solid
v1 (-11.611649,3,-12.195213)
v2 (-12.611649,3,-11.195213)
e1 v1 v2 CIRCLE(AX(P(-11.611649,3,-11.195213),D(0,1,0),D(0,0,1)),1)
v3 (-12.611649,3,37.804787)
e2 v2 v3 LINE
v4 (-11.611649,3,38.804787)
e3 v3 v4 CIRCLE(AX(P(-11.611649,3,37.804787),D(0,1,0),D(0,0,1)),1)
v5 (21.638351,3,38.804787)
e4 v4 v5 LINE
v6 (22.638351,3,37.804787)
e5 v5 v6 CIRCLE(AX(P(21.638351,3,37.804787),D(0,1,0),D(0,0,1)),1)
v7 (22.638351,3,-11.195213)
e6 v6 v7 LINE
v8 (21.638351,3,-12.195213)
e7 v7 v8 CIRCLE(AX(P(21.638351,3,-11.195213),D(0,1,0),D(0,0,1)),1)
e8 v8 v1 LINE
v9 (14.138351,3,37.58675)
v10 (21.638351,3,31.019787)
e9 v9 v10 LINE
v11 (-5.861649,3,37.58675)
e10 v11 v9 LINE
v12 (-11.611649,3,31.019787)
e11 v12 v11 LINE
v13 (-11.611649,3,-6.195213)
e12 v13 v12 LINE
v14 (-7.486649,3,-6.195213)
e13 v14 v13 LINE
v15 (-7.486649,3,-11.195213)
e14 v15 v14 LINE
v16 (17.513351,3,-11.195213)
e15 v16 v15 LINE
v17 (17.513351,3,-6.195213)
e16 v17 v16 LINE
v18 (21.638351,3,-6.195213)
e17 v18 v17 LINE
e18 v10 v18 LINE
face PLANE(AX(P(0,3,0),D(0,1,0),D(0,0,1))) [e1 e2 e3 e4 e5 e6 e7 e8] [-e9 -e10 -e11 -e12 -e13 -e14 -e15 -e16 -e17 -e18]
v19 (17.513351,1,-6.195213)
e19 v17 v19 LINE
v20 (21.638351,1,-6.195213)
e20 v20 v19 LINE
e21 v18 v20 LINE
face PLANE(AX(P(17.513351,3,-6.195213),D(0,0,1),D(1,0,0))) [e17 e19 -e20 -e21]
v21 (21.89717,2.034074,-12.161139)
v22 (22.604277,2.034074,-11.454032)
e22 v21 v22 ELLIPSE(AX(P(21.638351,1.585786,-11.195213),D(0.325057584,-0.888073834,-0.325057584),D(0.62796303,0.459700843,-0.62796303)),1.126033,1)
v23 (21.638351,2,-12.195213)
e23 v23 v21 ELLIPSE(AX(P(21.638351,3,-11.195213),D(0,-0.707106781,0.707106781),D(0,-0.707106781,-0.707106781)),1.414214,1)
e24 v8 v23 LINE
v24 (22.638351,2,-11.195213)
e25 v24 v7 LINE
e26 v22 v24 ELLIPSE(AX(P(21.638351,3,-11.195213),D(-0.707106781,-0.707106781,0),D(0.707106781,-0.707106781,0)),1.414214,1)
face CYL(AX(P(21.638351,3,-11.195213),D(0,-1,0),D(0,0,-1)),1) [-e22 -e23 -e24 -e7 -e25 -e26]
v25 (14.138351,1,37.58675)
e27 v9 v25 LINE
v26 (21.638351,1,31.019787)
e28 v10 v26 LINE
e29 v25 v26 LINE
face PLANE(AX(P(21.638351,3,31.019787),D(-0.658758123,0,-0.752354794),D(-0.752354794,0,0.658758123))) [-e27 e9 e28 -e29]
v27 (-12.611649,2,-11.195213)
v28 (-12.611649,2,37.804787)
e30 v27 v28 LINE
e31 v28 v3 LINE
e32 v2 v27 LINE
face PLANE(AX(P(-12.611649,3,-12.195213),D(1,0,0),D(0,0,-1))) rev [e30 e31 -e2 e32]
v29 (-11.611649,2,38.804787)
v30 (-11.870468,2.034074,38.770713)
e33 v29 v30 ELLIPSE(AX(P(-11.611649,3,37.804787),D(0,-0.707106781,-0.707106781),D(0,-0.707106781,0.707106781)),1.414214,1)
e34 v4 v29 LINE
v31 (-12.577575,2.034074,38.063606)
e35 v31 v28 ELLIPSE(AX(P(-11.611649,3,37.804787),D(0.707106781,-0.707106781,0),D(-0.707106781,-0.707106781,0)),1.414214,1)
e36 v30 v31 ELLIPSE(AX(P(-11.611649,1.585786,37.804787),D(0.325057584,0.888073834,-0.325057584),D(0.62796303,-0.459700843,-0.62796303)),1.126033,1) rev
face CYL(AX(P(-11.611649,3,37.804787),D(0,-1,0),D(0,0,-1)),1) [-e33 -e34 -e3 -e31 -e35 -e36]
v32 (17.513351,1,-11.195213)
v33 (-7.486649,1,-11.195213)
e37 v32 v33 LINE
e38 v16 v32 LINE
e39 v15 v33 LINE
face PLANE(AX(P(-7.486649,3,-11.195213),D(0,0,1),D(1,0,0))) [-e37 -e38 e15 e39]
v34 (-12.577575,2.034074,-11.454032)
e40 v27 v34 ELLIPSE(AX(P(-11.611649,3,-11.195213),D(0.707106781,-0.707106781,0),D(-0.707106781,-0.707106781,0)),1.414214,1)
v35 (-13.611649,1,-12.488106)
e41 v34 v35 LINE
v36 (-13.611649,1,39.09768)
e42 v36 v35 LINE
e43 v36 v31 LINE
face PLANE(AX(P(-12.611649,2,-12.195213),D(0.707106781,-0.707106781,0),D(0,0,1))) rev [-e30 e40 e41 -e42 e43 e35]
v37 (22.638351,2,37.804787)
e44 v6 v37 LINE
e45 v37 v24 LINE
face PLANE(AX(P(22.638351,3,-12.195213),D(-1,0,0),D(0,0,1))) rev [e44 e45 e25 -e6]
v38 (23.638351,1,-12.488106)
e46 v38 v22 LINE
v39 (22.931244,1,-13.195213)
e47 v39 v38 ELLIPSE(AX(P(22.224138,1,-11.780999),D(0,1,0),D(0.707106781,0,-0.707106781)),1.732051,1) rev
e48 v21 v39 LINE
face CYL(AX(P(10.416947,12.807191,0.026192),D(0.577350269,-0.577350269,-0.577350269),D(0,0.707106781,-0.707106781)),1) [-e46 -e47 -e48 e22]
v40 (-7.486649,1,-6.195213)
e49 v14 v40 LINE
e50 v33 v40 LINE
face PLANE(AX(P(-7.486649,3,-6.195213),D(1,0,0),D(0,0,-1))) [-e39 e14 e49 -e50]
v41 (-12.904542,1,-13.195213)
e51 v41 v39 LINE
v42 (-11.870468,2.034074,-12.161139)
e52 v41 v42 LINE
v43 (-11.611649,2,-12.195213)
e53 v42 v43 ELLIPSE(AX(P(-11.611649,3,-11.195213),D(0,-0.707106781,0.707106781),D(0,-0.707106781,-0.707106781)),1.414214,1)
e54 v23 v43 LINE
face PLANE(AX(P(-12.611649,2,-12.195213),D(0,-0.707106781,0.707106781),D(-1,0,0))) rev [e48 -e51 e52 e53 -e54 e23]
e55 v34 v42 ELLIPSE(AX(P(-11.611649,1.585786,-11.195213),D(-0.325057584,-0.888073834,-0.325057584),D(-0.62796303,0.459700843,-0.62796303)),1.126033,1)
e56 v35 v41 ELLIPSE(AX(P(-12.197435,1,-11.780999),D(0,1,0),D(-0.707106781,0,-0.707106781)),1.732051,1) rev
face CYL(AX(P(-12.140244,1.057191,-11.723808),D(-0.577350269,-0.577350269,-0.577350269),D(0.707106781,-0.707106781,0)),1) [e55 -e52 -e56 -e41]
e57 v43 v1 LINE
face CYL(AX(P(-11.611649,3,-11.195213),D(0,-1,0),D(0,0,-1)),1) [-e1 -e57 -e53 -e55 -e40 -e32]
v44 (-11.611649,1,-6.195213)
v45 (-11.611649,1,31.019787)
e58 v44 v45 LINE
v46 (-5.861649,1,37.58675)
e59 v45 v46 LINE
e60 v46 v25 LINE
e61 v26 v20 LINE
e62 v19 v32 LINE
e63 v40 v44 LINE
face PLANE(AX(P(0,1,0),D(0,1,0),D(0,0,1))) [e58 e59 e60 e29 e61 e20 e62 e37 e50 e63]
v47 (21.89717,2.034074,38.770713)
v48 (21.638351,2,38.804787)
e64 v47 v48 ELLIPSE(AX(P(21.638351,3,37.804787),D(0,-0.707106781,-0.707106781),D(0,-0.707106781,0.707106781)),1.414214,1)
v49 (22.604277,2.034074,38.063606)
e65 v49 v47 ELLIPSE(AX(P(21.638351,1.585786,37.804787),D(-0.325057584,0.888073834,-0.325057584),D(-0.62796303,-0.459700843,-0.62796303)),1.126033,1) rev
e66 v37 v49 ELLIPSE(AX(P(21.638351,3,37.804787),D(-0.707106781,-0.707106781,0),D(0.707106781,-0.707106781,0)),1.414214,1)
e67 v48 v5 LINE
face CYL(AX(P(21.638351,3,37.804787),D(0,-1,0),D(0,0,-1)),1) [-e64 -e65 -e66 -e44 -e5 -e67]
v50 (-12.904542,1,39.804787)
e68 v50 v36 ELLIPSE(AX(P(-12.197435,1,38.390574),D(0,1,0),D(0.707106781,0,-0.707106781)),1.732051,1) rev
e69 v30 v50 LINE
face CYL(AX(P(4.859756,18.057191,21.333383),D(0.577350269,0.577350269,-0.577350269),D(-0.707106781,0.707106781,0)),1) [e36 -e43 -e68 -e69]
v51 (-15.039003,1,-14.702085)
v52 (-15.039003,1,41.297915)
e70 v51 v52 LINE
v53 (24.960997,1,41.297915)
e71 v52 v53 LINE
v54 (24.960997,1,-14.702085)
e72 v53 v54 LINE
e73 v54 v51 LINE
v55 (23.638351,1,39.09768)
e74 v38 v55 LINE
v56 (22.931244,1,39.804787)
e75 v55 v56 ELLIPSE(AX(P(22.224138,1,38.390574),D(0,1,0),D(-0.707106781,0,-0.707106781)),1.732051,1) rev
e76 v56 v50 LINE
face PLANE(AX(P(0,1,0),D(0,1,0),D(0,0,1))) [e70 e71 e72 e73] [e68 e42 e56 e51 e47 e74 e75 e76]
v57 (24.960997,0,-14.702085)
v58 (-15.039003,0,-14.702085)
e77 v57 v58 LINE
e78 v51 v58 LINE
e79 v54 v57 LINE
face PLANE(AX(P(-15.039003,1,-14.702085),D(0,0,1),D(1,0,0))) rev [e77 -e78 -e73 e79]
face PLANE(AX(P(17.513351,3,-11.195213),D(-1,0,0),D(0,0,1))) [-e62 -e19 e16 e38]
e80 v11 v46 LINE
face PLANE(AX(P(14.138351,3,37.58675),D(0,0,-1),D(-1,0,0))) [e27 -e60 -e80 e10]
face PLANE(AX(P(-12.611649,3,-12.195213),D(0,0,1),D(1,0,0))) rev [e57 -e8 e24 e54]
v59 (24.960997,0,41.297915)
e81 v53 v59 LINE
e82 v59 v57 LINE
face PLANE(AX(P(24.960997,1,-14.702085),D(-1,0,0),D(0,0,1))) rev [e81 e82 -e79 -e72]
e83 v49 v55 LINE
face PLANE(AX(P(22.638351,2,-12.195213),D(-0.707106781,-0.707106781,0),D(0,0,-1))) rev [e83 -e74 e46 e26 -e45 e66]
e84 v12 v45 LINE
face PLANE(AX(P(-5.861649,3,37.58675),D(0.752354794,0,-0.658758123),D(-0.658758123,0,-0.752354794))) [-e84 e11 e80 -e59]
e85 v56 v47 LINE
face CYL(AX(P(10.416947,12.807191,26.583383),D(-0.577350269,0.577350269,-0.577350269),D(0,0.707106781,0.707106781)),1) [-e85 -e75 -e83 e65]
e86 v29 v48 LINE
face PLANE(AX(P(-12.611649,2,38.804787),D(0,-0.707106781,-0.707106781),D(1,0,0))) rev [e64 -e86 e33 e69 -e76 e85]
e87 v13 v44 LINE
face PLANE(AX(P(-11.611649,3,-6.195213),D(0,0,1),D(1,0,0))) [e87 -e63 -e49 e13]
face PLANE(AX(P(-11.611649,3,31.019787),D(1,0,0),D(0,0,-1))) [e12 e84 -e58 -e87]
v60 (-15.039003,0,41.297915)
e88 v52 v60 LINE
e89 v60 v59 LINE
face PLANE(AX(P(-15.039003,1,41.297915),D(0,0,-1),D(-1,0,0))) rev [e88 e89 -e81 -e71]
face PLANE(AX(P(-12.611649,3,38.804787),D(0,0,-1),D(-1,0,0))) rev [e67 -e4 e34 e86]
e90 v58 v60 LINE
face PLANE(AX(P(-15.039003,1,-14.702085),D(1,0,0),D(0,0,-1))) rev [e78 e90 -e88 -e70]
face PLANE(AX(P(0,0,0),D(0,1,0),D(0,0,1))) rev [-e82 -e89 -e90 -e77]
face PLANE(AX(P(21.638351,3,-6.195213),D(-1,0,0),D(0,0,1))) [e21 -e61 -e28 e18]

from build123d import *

# Parameters (mm, degrees)
SKETCH_1_W      = 40
SKETCH_1_H      = 56
EXTRUDE_1_DEPTH = 1
SKETCH_2_W      = 35.25
SKETCH_2_H      = 51
EXTRUDE_2_DEPTH = 2
CHAMFER_1_SIZE  = 1
FILLET_1_R      = 1


with BuildPart() as part:
    # Эскиз1 → Бобышка-Вытянуть1 (new body)
    with BuildSketch(Plane(origin=(0, 0, 0), x_dir=(1, 0, 0), z_dir=(0, 1, 0))):
        with Locations((4.960996663, -13.297915159)):
            Rectangle(SKETCH_1_W, SKETCH_1_H)
    extrude(amount=EXTRUDE_1_DEPTH)

    # Эскиз2 → Бобышка-Вытянуть2 (add)
    with BuildSketch(Plane(origin=(0, 1, 0), x_dir=(1, 0, 0), z_dir=(0, 1, 0))):
        with Locations((5.013351172, -13.304787139)):
            Rectangle(SKETCH_2_W, SKETCH_2_H)
        Polygon((-7.486648828, 11.195212861), (17.513351172, 11.195212861), (17.513351172, 6.195212861), (21.638351172, 6.195212861), (21.638351172, -31.019787139), (14.138351172, -37.586749907), (-5.861648828, -37.586749907), (-11.611648828, -31.019787139), (-11.611648828, 6.195212861), (-7.486648828, 6.195212861), align=None, mode=Mode.SUBTRACT)
    extrude(amount=EXTRUDE_2_DEPTH)

    # Фаска1
    chamfer_1_edges = [part.edges().sort_by_distance(p)[0] for p in [
        (-12.611648828, 1, 13.304787139),
        (5.013351172, 1, 38.804787139),
        (22.638351172, 1, 13.304787139),
        (5.013351172, 1, -12.195212861),
    ]]
    chamfer(chamfer_1_edges, length=CHAMFER_1_SIZE)

    # Скругление1
    # the kernel refuses this fillet: 1 mm, written as the material it takes off along each edge
    with BuildSketch(Plane(origin=(-12.611648828, -0.5, -12.195212861), x_dir=(0, 0, 1), z_dir=(0, 1, 0))) as fillet_1_piece_1_section:
        with BuildLine():
            CenterArc((FILLET_1_R, FILLET_1_R), FILLET_1_R, 180, 90)
            Line((0, FILLET_1_R), (0, 0))
            Line((0, 0), (FILLET_1_R, 0))
        make_face()
    fillet_1_piece_1 = extrude(amount=6, mode=Mode.PRIVATE)
    fillet_1_piece_1 = split(fillet_1_piece_1, bisect_by=Plane(origin=(-12.204207693, 2.407441135, -12.152230903), z_dir=(0.7071067811865476, -0.7071067811865476, 0)), keep=Keep.TOP, mode=Mode.PRIVATE)
    fillet_1_piece_1 = split(fillet_1_piece_1, bisect_by=Plane(origin=(-12.0827213, 2.16446835, -12.030744511), z_dir=(0, 0.7071067811865476, -0.7071067811865476)), keep=Keep.TOP, mode=Mode.PRIVATE)
    add(fillet_1_piece_1, mode=Mode.SUBTRACT)
    with BuildSketch(Plane(origin=(-12.611648828, -0.5, -12.195212861), x_dir=(0, 0, 1), z_dir=(0, 1, 0))) as fillet_1_piece_2_section:
        with BuildLine():
            CenterArc((FILLET_1_R, FILLET_1_R), FILLET_1_R, 180, 90)
            Line((0, FILLET_1_R), (0, 0))
            Line((0, 0), (FILLET_1_R, 0))
        make_face()
    fillet_1_piece_2 = extrude(amount=6, mode=Mode.PRIVATE)
    fillet_1_piece_2 = split(fillet_1_piece_2, bisect_by=Plane(origin=(-12.447180477, 2.16446835, -11.666285334), z_dir=(-0.7071067811865476, 0.7071067811865476, 0)), keep=Keep.TOP, mode=Mode.PRIVATE)
    fillet_1_piece_2 = split(fillet_1_piece_2, bisect_by=Plane(origin=(-12.56866687, 2.407441135, -11.787771726), z_dir=(0, -0.7071067811865476, 0.7071067811865476)), keep=Keep.TOP, mode=Mode.PRIVATE)
    add(fillet_1_piece_2, mode=Mode.SUBTRACT)
    with BuildSketch(Plane(origin=(-12.611648828, -0.5, -12.195212861), x_dir=(0, 0, 1), z_dir=(0, 1, 0))) as fillet_1_piece_3_section:
        with BuildLine():
            CenterArc((FILLET_1_R, FILLET_1_R), FILLET_1_R, 180, 90)
            Line((0, FILLET_1_R), (0, 0))
            Line((0, 0), (FILLET_1_R, 0))
        make_face()
    fillet_1_piece_3 = extrude(amount=6, mode=Mode.PRIVATE)
    fillet_1_piece_3 = split(fillet_1_piece_3, bisect_by=Plane(origin=(-11.535111432, 3.076537395, -11.974767382), z_dir=(-0.7071067811865476, 0.7071067811865476, 0)), keep=Keep.TOP, mode=Mode.PRIVATE)
    fillet_1_piece_3 = split(fillet_1_piece_3, bisect_by=Plane(origin=(-12.391203349, 3.076537395, -11.118675466), z_dir=(0, 0.7071067811865476, -0.7071067811865476)), keep=Keep.TOP, mode=Mode.PRIVATE)
    add(fillet_1_piece_3, mode=Mode.SUBTRACT)
    with BuildSketch(Plane(origin=(-12.611648828, -0.5, 38.804787139), x_dir=(0, 0, -1), z_dir=(0, 1, 0))) as fillet_1_piece_4_section:
        with BuildLine():
            CenterArc((FILLET_1_R, -FILLET_1_R), FILLET_1_R, 90, 90)
            Line((0, -FILLET_1_R), (0, 0))
            Line((0, 0), (FILLET_1_R, 0))
        make_face()
    fillet_1_piece_4 = extrude(amount=6, mode=Mode.PRIVATE)
    fillet_1_piece_4 = split(fillet_1_piece_4, bisect_by=Plane(origin=(-12.204207693, 2.407441135, 38.761805181), z_dir=(0.7071067811865476, -0.7071067811865476, 0)), keep=Keep.TOP, mode=Mode.PRIVATE)
    fillet_1_piece_4 = split(fillet_1_piece_4, bisect_by=Plane(origin=(-12.0827213, 2.16446835, 38.640318789), z_dir=(0, 0.7071067811865476, 0.7071067811865476)), keep=Keep.TOP, mode=Mode.PRIVATE)
    add(fillet_1_piece_4, mode=Mode.SUBTRACT)
    with BuildSketch(Plane(origin=(-12.611648828, -0.5, 38.804787139), x_dir=(0, 0, -1), z_dir=(0, 1, 0))) as fillet_1_piece_5_section:
        with BuildLine():
            CenterArc((FILLET_1_R, -FILLET_1_R), FILLET_1_R, 90, 90)
            Line((0, -FILLET_1_R), (0, 0))
            Line((0, 0), (FILLET_1_R, 0))
        make_face()
    fillet_1_piece_5 = extrude(amount=6, mode=Mode.PRIVATE)
    fillet_1_piece_5 = split(fillet_1_piece_5, bisect_by=Plane(origin=(-12.447180477, 2.16446835, 38.275859612), z_dir=(-0.7071067811865476, 0.7071067811865476, 0)), keep=Keep.TOP, mode=Mode.PRIVATE)
    fillet_1_piece_5 = split(fillet_1_piece_5, bisect_by=Plane(origin=(-12.56866687, 2.407441135, 38.397346004), z_dir=(0, -0.7071067811865476, -0.7071067811865476)), keep=Keep.TOP, mode=Mode.PRIVATE)
    add(fillet_1_piece_5, mode=Mode.SUBTRACT)
    with BuildSketch(Plane(origin=(-12.611648828, -0.5, 38.804787139), x_dir=(0, 0, -1), z_dir=(0, 1, 0))) as fillet_1_piece_6_section:
        with BuildLine():
            CenterArc((FILLET_1_R, -FILLET_1_R), FILLET_1_R, 90, 90)
            Line((0, -FILLET_1_R), (0, 0))
            Line((0, 0), (FILLET_1_R, 0))
        make_face()
    fillet_1_piece_6 = extrude(amount=6, mode=Mode.PRIVATE)
    fillet_1_piece_6 = split(fillet_1_piece_6, bisect_by=Plane(origin=(-11.535111432, 3.076537395, 38.58434166), z_dir=(-0.7071067811865476, 0.7071067811865476, 0)), keep=Keep.TOP, mode=Mode.PRIVATE)
    fillet_1_piece_6 = split(fillet_1_piece_6, bisect_by=Plane(origin=(-12.391203349, 3.076537395, 37.728249744), z_dir=(0, 0.7071067811865476, 0.7071067811865476)), keep=Keep.TOP, mode=Mode.PRIVATE)
    add(fillet_1_piece_6, mode=Mode.SUBTRACT)
    with BuildSketch(Plane(origin=(22.638351172, -0.5, 38.804787139), x_dir=(-1, 0, 0), z_dir=(0, 1, 0))) as fillet_1_piece_7_section:
        with BuildLine():
            CenterArc((FILLET_1_R, -FILLET_1_R), FILLET_1_R, 90, 90)
            Line((0, -FILLET_1_R), (0, 0))
            Line((0, 0), (FILLET_1_R, 0))
        make_face()
    fillet_1_piece_7 = extrude(amount=6, mode=Mode.PRIVATE)
    fillet_1_piece_7 = split(fillet_1_piece_7, bisect_by=Plane(origin=(22.595369214, 2.407441135, 38.397346004), z_dir=(0, -0.7071067811865476, -0.7071067811865476)), keep=Keep.TOP, mode=Mode.PRIVATE)
    fillet_1_piece_7 = split(fillet_1_piece_7, bisect_by=Plane(origin=(22.473882822, 2.16446835, 38.275859612), z_dir=(0.7071067811865476, 0.7071067811865476, 0)), keep=Keep.TOP, mode=Mode.PRIVATE)
    add(fillet_1_piece_7, mode=Mode.SUBTRACT)
    with BuildSketch(Plane(origin=(22.638351172, -0.5, 38.804787139), x_dir=(-1, 0, 0), z_dir=(0, 1, 0))) as fillet_1_piece_8_section:
        with BuildLine():
            CenterArc((FILLET_1_R, -FILLET_1_R), FILLET_1_R, 90, 90)
            Line((0, -FILLET_1_R), (0, 0))
            Line((0, 0), (FILLET_1_R, 0))
        make_face()
    fillet_1_piece_8 = extrude(amount=6, mode=Mode.PRIVATE)
    fillet_1_piece_8 = split(fillet_1_piece_8, bisect_by=Plane(origin=(22.109423645, 2.16446835, 38.640318789), z_dir=(0, 0.7071067811865476, 0.7071067811865476)), keep=Keep.TOP, mode=Mode.PRIVATE)
    fillet_1_piece_8 = split(fillet_1_piece_8, bisect_by=Plane(origin=(22.230910038, 2.407441135, 38.761805181), z_dir=(-0.7071067811865476, -0.7071067811865476, 0)), keep=Keep.TOP, mode=Mode.PRIVATE)
    add(fillet_1_piece_8, mode=Mode.SUBTRACT)
    with BuildSketch(Plane(origin=(22.638351172, -0.5, 38.804787139), x_dir=(-1, 0, 0), z_dir=(0, 1, 0))) as fillet_1_piece_9_section:
        with BuildLine():
            CenterArc((FILLET_1_R, -FILLET_1_R), FILLET_1_R, 90, 90)
            Line((0, -FILLET_1_R), (0, 0))
            Line((0, 0), (FILLET_1_R, 0))
        make_face()
    fillet_1_piece_9 = extrude(amount=6, mode=Mode.PRIVATE)
    fillet_1_piece_9 = split(fillet_1_piece_9, bisect_by=Plane(origin=(22.417905694, 3.076537395, 37.728249744), z_dir=(0, 0.7071067811865476, 0.7071067811865476)), keep=Keep.TOP, mode=Mode.PRIVATE)
    fillet_1_piece_9 = split(fillet_1_piece_9, bisect_by=Plane(origin=(21.561813777, 3.076537395, 38.58434166), z_dir=(0.7071067811865476, 0.7071067811865476, 0)), keep=Keep.TOP, mode=Mode.PRIVATE)
    add(fillet_1_piece_9, mode=Mode.SUBTRACT)
    with BuildSketch(Plane(origin=(22.638351172, -0.5, -12.195212861), x_dir=(-1, 0, 0), z_dir=(0, 1, 0))) as fillet_1_piece_10_section:
        with BuildLine():
            CenterArc((FILLET_1_R, FILLET_1_R), FILLET_1_R, 180, 90)
            Line((0, FILLET_1_R), (0, 0))
            Line((0, 0), (FILLET_1_R, 0))
        make_face()
    fillet_1_piece_10 = extrude(amount=6, mode=Mode.PRIVATE)
    fillet_1_piece_10 = split(fillet_1_piece_10, bisect_by=Plane(origin=(22.595369214, 2.407441135, -11.787771726), z_dir=(0, -0.7071067811865476, 0.7071067811865476)), keep=Keep.TOP, mode=Mode.PRIVATE)
    fillet_1_piece_10 = split(fillet_1_piece_10, bisect_by=Plane(origin=(22.473882822, 2.16446835, -11.666285334), z_dir=(0.7071067811865476, 0.7071067811865476, 0)), keep=Keep.TOP, mode=Mode.PRIVATE)
    add(fillet_1_piece_10, mode=Mode.SUBTRACT)
    with BuildSketch(Plane(origin=(22.638351172, -0.5, -12.195212861), x_dir=(-1, 0, 0), z_dir=(0, 1, 0))) as fillet_1_piece_11_section:
        with BuildLine():
            CenterArc((FILLET_1_R, FILLET_1_R), FILLET_1_R, 180, 90)
            Line((0, FILLET_1_R), (0, 0))
            Line((0, 0), (FILLET_1_R, 0))
        make_face()
    fillet_1_piece_11 = extrude(amount=6, mode=Mode.PRIVATE)
    fillet_1_piece_11 = split(fillet_1_piece_11, bisect_by=Plane(origin=(22.109423645, 2.16446835, -12.030744511), z_dir=(0, 0.7071067811865476, -0.7071067811865476)), keep=Keep.TOP, mode=Mode.PRIVATE)
    fillet_1_piece_11 = split(fillet_1_piece_11, bisect_by=Plane(origin=(22.230910038, 2.407441135, -12.152230903), z_dir=(-0.7071067811865476, -0.7071067811865476, 0)), keep=Keep.TOP, mode=Mode.PRIVATE)
    add(fillet_1_piece_11, mode=Mode.SUBTRACT)
    with BuildSketch(Plane(origin=(22.638351172, -0.5, -12.195212861), x_dir=(-1, 0, 0), z_dir=(0, 1, 0))) as fillet_1_piece_12_section:
        with BuildLine():
            CenterArc((FILLET_1_R, FILLET_1_R), FILLET_1_R, 180, 90)
            Line((0, FILLET_1_R), (0, 0))
            Line((0, 0), (FILLET_1_R, 0))
        make_face()
    fillet_1_piece_12 = extrude(amount=6, mode=Mode.PRIVATE)
    fillet_1_piece_12 = split(fillet_1_piece_12, bisect_by=Plane(origin=(22.417905694, 3.076537395, -11.118675466), z_dir=(0, 0.7071067811865476, -0.7071067811865476)), keep=Keep.TOP, mode=Mode.PRIVATE)
    fillet_1_piece_12 = split(fillet_1_piece_12, bisect_by=Plane(origin=(21.561813777, 3.076537395, -11.974767382), z_dir=(0.7071067811865476, 0.7071067811865476, 0)), keep=Keep.TOP, mode=Mode.PRIVATE)
    add(fillet_1_piece_12, mode=Mode.SUBTRACT)
    with BuildSketch(Plane(origin=(24.471684506, 0.166666667, -14.028546194), x_dir=(-0.816496580927726, -0.4082482904638632, -0.40824829046386296), z_dir=(-0.5773502691896258, 0.5773502691896258, 0.5773502691896258))) as fillet_1_piece_13_section:
        with BuildLine():
            CenterArc((FILLET_1_R * 0.57735026919, FILLET_1_R), FILLET_1_R, 210, 60)
            Line((-FILLET_1_R * 0.288675134595, FILLET_1_R * 0.5), (0, 0))
            Line((0, 0), (FILLET_1_R * 0.57735026919, 0))
        make_face()
    fillet_1_piece_13 = extrude(amount=4.618802154, mode=Mode.PRIVATE)
    fillet_1_piece_13 = split(fillet_1_piece_13, bisect_by=Plane(origin=(23.11868341, 1, -12.675545099), z_dir=(0, 1, 0)), keep=Keep.TOP, mode=Mode.PRIVATE)
    fillet_1_piece_13 = split(fillet_1_piece_13, bisect_by=Plane(origin=(23.11868341, 1.382025047, -12.195212861), z_dir=(0, 0, -1)), keep=Keep.TOP, mode=Mode.PRIVATE)
    fillet_1_piece_13 = split(fillet_1_piece_13, bisect_by=Plane(origin=(22.638351172, 1.382025047, -12.675545099), z_dir=(1, 0, 0)), keep=Keep.TOP, mode=Mode.PRIVATE)
    add(fillet_1_piece_13, mode=Mode.SUBTRACT)
    with BuildSketch(Plane(origin=(24.471684506, 0.166666667, -14.028546194), x_dir=(-0.816496580927726, -0.4082482904638632, -0.40824829046386296), z_dir=(-0.5773502691896258, 0.5773502691896258, 0.5773502691896258))) as fillet_1_piece_14_section:
        with BuildLine():
            CenterArc((FILLET_1_R * 0.57735026919, FILLET_1_R), FILLET_1_R, 210, 60)
            Line((-FILLET_1_R * 0.288675134595, FILLET_1_R * 0.5), (0, 0))
            Line((0, 0), (FILLET_1_R * 0.57735026919, 0))
        make_face()
    fillet_1_piece_14 = extrude(amount=4.618802154, mode=Mode.PRIVATE)
    fillet_1_piece_14 = split(fillet_1_piece_14, bisect_by=Plane(origin=(22.825799609, 1.79813974, -12.195212861), z_dir=(0, 0, 1)), keep=Keep.TOP, mode=Mode.PRIVATE)
    fillet_1_piece_14 = split(fillet_1_piece_14, bisect_by=Plane(origin=(22.638351172, 1.79813974, -12.007764424), z_dir=(1, 0, 0)), keep=Keep.TOP, mode=Mode.PRIVATE)
    add(fillet_1_piece_14, mode=Mode.SUBTRACT)
    with BuildSketch(Plane(origin=(24.471684506, 0.166666667, -14.028546194), x_dir=(-0.816496580927726, -0.4082482904638632, -0.40824829046386296), z_dir=(-0.5773502691896258, 0.5773502691896258, 0.5773502691896258))) as fillet_1_piece_15_section:
        with BuildLine():
            CenterArc((FILLET_1_R * 0.57735026919, FILLET_1_R), FILLET_1_R, 210, 60)
            Line((-FILLET_1_R * 0.288675134595, FILLET_1_R * 0.5), (0, 0))
            Line((0, 0), (FILLET_1_R * 0.57735026919, 0))
        make_face()
    fillet_1_piece_15 = extrude(amount=4.618802154, mode=Mode.PRIVATE)
    fillet_1_piece_15 = split(fillet_1_piece_15, bisect_by=Plane(origin=(22.450902736, 1.79813974, -12.195212861), z_dir=(0, 0, -1)), keep=Keep.TOP, mode=Mode.PRIVATE)
    fillet_1_piece_15 = split(fillet_1_piece_15, bisect_by=Plane(origin=(22.638351172, 1.79813974, -12.382661298), z_dir=(-1, 0, 0)), keep=Keep.TOP, mode=Mode.PRIVATE)
    add(fillet_1_piece_15, mode=Mode.SUBTRACT)
    with BuildSketch(Plane(origin=(24.471684506, 0.166666667, 40.638120472), x_dir=(-0.816496580927726, -0.40824829046385686, 0.4082482904638692), z_dir=(-0.5773502691896258, 0.5773502691896258, -0.5773502691896258))) as fillet_1_piece_16_section:
        with BuildLine():
            CenterArc((FILLET_1_R * 0.57735026919, -FILLET_1_R), FILLET_1_R, 90, 60)
            Line((-FILLET_1_R * 0.288675134595, -FILLET_1_R * 0.5), (0, 0))
            Line((0, 0), (FILLET_1_R * 0.57735026919, 0))
        make_face()
    fillet_1_piece_16 = extrude(amount=4.618802154, mode=Mode.PRIVATE)
    fillet_1_piece_16 = split(fillet_1_piece_16, bisect_by=Plane(origin=(23.11868341, 1, 39.285119377), z_dir=(0, 1, 0)), keep=Keep.TOP, mode=Mode.PRIVATE)
    fillet_1_piece_16 = split(fillet_1_piece_16, bisect_by=Plane(origin=(23.11868341, 1.382025047, 38.804787139), z_dir=(0, 0, 1)), keep=Keep.TOP, mode=Mode.PRIVATE)
    fillet_1_piece_16 = split(fillet_1_piece_16, bisect_by=Plane(origin=(22.638351172, 1.382025047, 39.285119377), z_dir=(1, 0, 0)), keep=Keep.TOP, mode=Mode.PRIVATE)
    add(fillet_1_piece_16, mode=Mode.SUBTRACT)
    with BuildSketch(Plane(origin=(24.471684506, 0.166666667, 40.638120472), x_dir=(-0.816496580927726, -0.40824829046385686, 0.4082482904638692), z_dir=(-0.5773502691896258, 0.5773502691896258, -0.5773502691896258))) as fillet_1_piece_17_section:
        with BuildLine():
            CenterArc((FILLET_1_R * 0.57735026919, -FILLET_1_R), FILLET_1_R, 90, 60)
            Line((-FILLET_1_R * 0.288675134595, -FILLET_1_R * 0.5), (0, 0))
            Line((0, 0), (FILLET_1_R * 0.57735026919, 0))
        make_face()
    fillet_1_piece_17 = extrude(amount=4.618802154, mode=Mode.PRIVATE)
    fillet_1_piece_17 = split(fillet_1_piece_17, bisect_by=Plane(origin=(22.825799609, 1.79813974, 38.804787139), z_dir=(0, 0, -1)), keep=Keep.TOP, mode=Mode.PRIVATE)
    fillet_1_piece_17 = split(fillet_1_piece_17, bisect_by=Plane(origin=(22.638351172, 1.79813974, 38.617338702), z_dir=(1, 0, 0)), keep=Keep.TOP, mode=Mode.PRIVATE)
    add(fillet_1_piece_17, mode=Mode.SUBTRACT)
    with BuildSketch(Plane(origin=(24.471684506, 0.166666667, 40.638120472), x_dir=(-0.816496580927726, -0.40824829046385686, 0.4082482904638692), z_dir=(-0.5773502691896258, 0.5773502691896258, -0.5773502691896258))) as fillet_1_piece_18_section:
        with BuildLine():
            CenterArc((FILLET_1_R * 0.57735026919, -FILLET_1_R), FILLET_1_R, 90, 60)
            Line((-FILLET_1_R * 0.288675134595, -FILLET_1_R * 0.5), (0, 0))
            Line((0, 0), (FILLET_1_R * 0.57735026919, 0))
        make_face()
    fillet_1_piece_18 = extrude(amount=4.618802154, mode=Mode.PRIVATE)
    fillet_1_piece_18 = split(fillet_1_piece_18, bisect_by=Plane(origin=(22.450902736, 1.79813974, 38.804787139), z_dir=(0, 0, 1)), keep=Keep.TOP, mode=Mode.PRIVATE)
    fillet_1_piece_18 = split(fillet_1_piece_18, bisect_by=Plane(origin=(22.638351172, 1.79813974, 38.992235576), z_dir=(-1, 0, 0)), keep=Keep.TOP, mode=Mode.PRIVATE)
    add(fillet_1_piece_18, mode=Mode.SUBTRACT)
    with BuildSketch(Plane(origin=(-14.444982161, 0.166666667, -14.028546194), x_dir=(-0.40824829046386274, -0.40824829046386335, 0.8164965809277261), z_dir=(0.5773502691896258, 0.5773502691896258, 0.5773502691896258))) as fillet_1_piece_19_section:
        with BuildLine():
            CenterArc((FILLET_1_R * 0.57735026919, FILLET_1_R), FILLET_1_R, 210, 60)
            Line((-FILLET_1_R * 0.288675134595, FILLET_1_R * 0.5), (0, 0))
            Line((0, 0), (FILLET_1_R * 0.57735026919, 0))
        make_face()
    fillet_1_piece_19 = extrude(amount=4.618802154, mode=Mode.PRIVATE)
    fillet_1_piece_19 = split(fillet_1_piece_19, bisect_by=Plane(origin=(-13.091981065, 1, -12.675545099), z_dir=(0, 1, 0)), keep=Keep.TOP, mode=Mode.PRIVATE)
    fillet_1_piece_19 = split(fillet_1_piece_19, bisect_by=Plane(origin=(-12.611648828, 1.382025047, -12.675545099), z_dir=(-1, 0, 0)), keep=Keep.TOP, mode=Mode.PRIVATE)
    fillet_1_piece_19 = split(fillet_1_piece_19, bisect_by=Plane(origin=(-13.091981065, 1.382025047, -12.195212861), z_dir=(0, 0, -1)), keep=Keep.TOP, mode=Mode.PRIVATE)
    add(fillet_1_piece_19, mode=Mode.SUBTRACT)
    with BuildSketch(Plane(origin=(-14.444982161, 0.166666667, -14.028546194), x_dir=(-0.40824829046386274, -0.40824829046386335, 0.8164965809277261), z_dir=(0.5773502691896258, 0.5773502691896258, 0.5773502691896258))) as fillet_1_piece_20_section:
        with BuildLine():
            CenterArc((FILLET_1_R * 0.57735026919, FILLET_1_R), FILLET_1_R, 210, 60)
            Line((-FILLET_1_R * 0.288675134595, FILLET_1_R * 0.5), (0, 0))
            Line((0, 0), (FILLET_1_R * 0.57735026919, 0))
        make_face()
    fillet_1_piece_20 = extrude(amount=4.618802154, mode=Mode.PRIVATE)
    fillet_1_piece_20 = split(fillet_1_piece_20, bisect_by=Plane(origin=(-12.611648828, 1.79813974, -12.382661298), z_dir=(1, 0, 0)), keep=Keep.TOP, mode=Mode.PRIVATE)
    fillet_1_piece_20 = split(fillet_1_piece_20, bisect_by=Plane(origin=(-12.424200391, 1.79813974, -12.195212861), z_dir=(0, 0, -1)), keep=Keep.TOP, mode=Mode.PRIVATE)
    add(fillet_1_piece_20, mode=Mode.SUBTRACT)
    with BuildSketch(Plane(origin=(-14.444982161, 0.166666667, -14.028546194), x_dir=(-0.40824829046386274, -0.40824829046386335, 0.8164965809277261), z_dir=(0.5773502691896258, 0.5773502691896258, 0.5773502691896258))) as fillet_1_piece_21_section:
        with BuildLine():
            CenterArc((FILLET_1_R * 0.57735026919, FILLET_1_R), FILLET_1_R, 210, 60)
            Line((-FILLET_1_R * 0.288675134595, FILLET_1_R * 0.5), (0, 0))
            Line((0, 0), (FILLET_1_R * 0.57735026919, 0))
        make_face()
    fillet_1_piece_21 = extrude(amount=4.618802154, mode=Mode.PRIVATE)
    fillet_1_piece_21 = split(fillet_1_piece_21, bisect_by=Plane(origin=(-12.611648828, 1.79813974, -12.007764424), z_dir=(-1, 0, 0)), keep=Keep.TOP, mode=Mode.PRIVATE)
    fillet_1_piece_21 = split(fillet_1_piece_21, bisect_by=Plane(origin=(-12.799097264, 1.79813974, -12.195212861), z_dir=(0, 0, 1)), keep=Keep.TOP, mode=Mode.PRIVATE)
    add(fillet_1_piece_21, mode=Mode.SUBTRACT)
    with BuildSketch(Plane(origin=(-14.444982161, 0.166666667, 40.638120472), x_dir=(-0.4082482904638619, -0.408248290463864, -0.816496580927726), z_dir=(0.5773502691896258, 0.5773502691896258, -0.5773502691896258))) as fillet_1_piece_22_section:
        with BuildLine():
            CenterArc((FILLET_1_R * 0.57735026919, -FILLET_1_R), FILLET_1_R, 90, 60)
            Line((-FILLET_1_R * 0.288675134595, -FILLET_1_R * 0.5), (0, 0))
            Line((0, 0), (FILLET_1_R * 0.57735026919, 0))
        make_face()
    fillet_1_piece_22 = extrude(amount=4.618802154, mode=Mode.PRIVATE)
    fillet_1_piece_22 = split(fillet_1_piece_22, bisect_by=Plane(origin=(-13.091981065, 1, 39.285119377), z_dir=(0, 1, 0)), keep=Keep.TOP, mode=Mode.PRIVATE)
    fillet_1_piece_22 = split(fillet_1_piece_22, bisect_by=Plane(origin=(-12.611648828, 1.382025047, 39.285119377), z_dir=(-1, 0, 0)), keep=Keep.TOP, mode=Mode.PRIVATE)
    fillet_1_piece_22 = split(fillet_1_piece_22, bisect_by=Plane(origin=(-13.091981065, 1.382025047, 38.804787139), z_dir=(0, 0, 1)), keep=Keep.TOP, mode=Mode.PRIVATE)
    add(fillet_1_piece_22, mode=Mode.SUBTRACT)
    with BuildSketch(Plane(origin=(-14.444982161, 0.166666667, 40.638120472), x_dir=(-0.4082482904638619, -0.408248290463864, -0.816496580927726), z_dir=(0.5773502691896258, 0.5773502691896258, -0.5773502691896258))) as fillet_1_piece_23_section:
        with BuildLine():
            CenterArc((FILLET_1_R * 0.57735026919, -FILLET_1_R), FILLET_1_R, 90, 60)
            Line((-FILLET_1_R * 0.288675134595, -FILLET_1_R * 0.5), (0, 0))
            Line((0, 0), (FILLET_1_R * 0.57735026919, 0))
        make_face()
    fillet_1_piece_23 = extrude(amount=4.618802154, mode=Mode.PRIVATE)
    fillet_1_piece_23 = split(fillet_1_piece_23, bisect_by=Plane(origin=(-12.611648828, 1.79813974, 38.992235576), z_dir=(1, 0, 0)), keep=Keep.TOP, mode=Mode.PRIVATE)
    fillet_1_piece_23 = split(fillet_1_piece_23, bisect_by=Plane(origin=(-12.424200391, 1.79813974, 38.804787139), z_dir=(0, 0, 1)), keep=Keep.TOP, mode=Mode.PRIVATE)
    add(fillet_1_piece_23, mode=Mode.SUBTRACT)
    with BuildSketch(Plane(origin=(-14.444982161, 0.166666667, 40.638120472), x_dir=(-0.4082482904638619, -0.408248290463864, -0.816496580927726), z_dir=(0.5773502691896258, 0.5773502691896258, -0.5773502691896258))) as fillet_1_piece_24_section:
        with BuildLine():
            CenterArc((FILLET_1_R * 0.57735026919, -FILLET_1_R), FILLET_1_R, 90, 60)
            Line((-FILLET_1_R * 0.288675134595, -FILLET_1_R * 0.5), (0, 0))
            Line((0, 0), (FILLET_1_R * 0.57735026919, 0))
        make_face()
    fillet_1_piece_24 = extrude(amount=4.618802154, mode=Mode.PRIVATE)
    fillet_1_piece_24 = split(fillet_1_piece_24, bisect_by=Plane(origin=(-12.611648828, 1.79813974, 38.617338702), z_dir=(-1, 0, 0)), keep=Keep.TOP, mode=Mode.PRIVATE)
    fillet_1_piece_24 = split(fillet_1_piece_24, bisect_by=Plane(origin=(-12.799097264, 1.79813974, 38.804787139), z_dir=(0, 0, -1)), keep=Keep.TOP, mode=Mode.PRIVATE)
    add(fillet_1_piece_24, mode=Mode.SUBTRACT)
    with BuildSketch(Plane(origin=(-14.444982161, 0.166666667, -14.028546194), x_dir=(-0.40824829046386274, -0.40824829046386335, 0.8164965809277261), z_dir=(0.5773502691896258, 0.5773502691896258, 0.5773502691896258))) as fillet_1_piece_25a_section:
        with BuildLine():
            CenterArc((FILLET_1_R * 0.57735026919, FILLET_1_R), FILLET_1_R, 210, 60)
            Line((-FILLET_1_R * 0.288675134595, FILLET_1_R * 0.5), (0, 0))
            Line((0, 0), (FILLET_1_R * 0.57735026919, 0))
        make_face()
    fillet_1_piece_25a = extrude(amount=4.618802154, mode=Mode.PRIVATE)
    fillet_1_piece_25a = split(fillet_1_piece_25a, bisect_by=Plane(origin=(-12.611648828, 2.347749558, -11.699257601), z_dir=(1, 0, 0)), keep=Keep.TOP, mode=Mode.PRIVATE)
    fillet_1_piece_25a = split(fillet_1_piece_25a, bisect_by=Plane(origin=(-12.115693568, 2.347749558, -12.195212861), z_dir=(0, 0, 1)), keep=Keep.TOP, mode=Mode.PRIVATE)
    with BuildSketch(Plane(origin=(-12.611648828, -0.5, -12.195212861), x_dir=(0, 0, 1), z_dir=(0, 1, 0))) as fillet_1_piece_25b_section:
        with BuildLine():
            CenterArc((FILLET_1_R, FILLET_1_R), FILLET_1_R, 180, 90)
            Line((0, FILLET_1_R), (0, 0))
            Line((0, 0), (FILLET_1_R, 0))
        make_face()
    fillet_1_piece_25b = extrude(amount=6, mode=Mode.PRIVATE)
    fillet_1_piece_25b = split(fillet_1_piece_25b, bisect_by=Plane(origin=(-13.104295651, 1.507353177, -11.968643573), z_dir=(0.7071067811865476, -0.7071067811865476, 0)), keep=Keep.TOP, mode=Mode.PRIVATE)
    fillet_1_piece_25b = split(fillet_1_piece_25b, bisect_by=Plane(origin=(-12.38507954, 1.507353177, -12.687859684), z_dir=(0, -0.7071067811865476, 0.7071067811865476)), keep=Keep.TOP, mode=Mode.PRIVATE)
    fillet_1_piece_25 = fillet_1_piece_25a & fillet_1_piece_25b
    add(fillet_1_piece_25, mode=Mode.SUBTRACT)
    with BuildSketch(Plane(origin=(-14.444982161, 0.166666667, 40.638120472), x_dir=(-0.4082482904638619, -0.408248290463864, -0.816496580927726), z_dir=(0.5773502691896258, 0.5773502691896258, -0.5773502691896258))) as fillet_1_piece_26a_section:
        with BuildLine():
            CenterArc((FILLET_1_R * 0.57735026919, -FILLET_1_R), FILLET_1_R, 90, 60)
            Line((-FILLET_1_R * 0.288675134595, -FILLET_1_R * 0.5), (0, 0))
            Line((0, 0), (FILLET_1_R * 0.57735026919, 0))
        make_face()
    fillet_1_piece_26a = extrude(amount=4.618802154, mode=Mode.PRIVATE)
    fillet_1_piece_26a = split(fillet_1_piece_26a, bisect_by=Plane(origin=(-12.611648828, 2.347749558, 38.308831879), z_dir=(1, 0, 0)), keep=Keep.TOP, mode=Mode.PRIVATE)
    fillet_1_piece_26a = split(fillet_1_piece_26a, bisect_by=Plane(origin=(-12.115693568, 2.347749558, 38.804787139), z_dir=(0, 0, -1)), keep=Keep.TOP, mode=Mode.PRIVATE)
    with BuildSketch(Plane(origin=(-12.611648828, -0.5, 38.804787139), x_dir=(0, 0, -1), z_dir=(0, 1, 0))) as fillet_1_piece_26b_section:
        with BuildLine():
            CenterArc((FILLET_1_R, -FILLET_1_R), FILLET_1_R, 90, 90)
            Line((0, -FILLET_1_R), (0, 0))
            Line((0, 0), (FILLET_1_R, 0))
        make_face()
    fillet_1_piece_26b = extrude(amount=6, mode=Mode.PRIVATE)
    fillet_1_piece_26b = split(fillet_1_piece_26b, bisect_by=Plane(origin=(-13.104295651, 1.507353177, 38.578217851), z_dir=(0.7071067811865476, -0.7071067811865476, 0)), keep=Keep.TOP, mode=Mode.PRIVATE)
    fillet_1_piece_26b = split(fillet_1_piece_26b, bisect_by=Plane(origin=(-12.38507954, 1.507353177, 39.297433962), z_dir=(0, -0.7071067811865476, -0.7071067811865476)), keep=Keep.TOP, mode=Mode.PRIVATE)
    fillet_1_piece_26 = fillet_1_piece_26a & fillet_1_piece_26b
    add(fillet_1_piece_26, mode=Mode.SUBTRACT)
    with BuildSketch(Plane(origin=(24.471684506, 0.166666667, 40.638120472), x_dir=(-0.816496580927726, -0.40824829046385686, 0.4082482904638692), z_dir=(-0.5773502691896258, 0.5773502691896258, -0.5773502691896258))) as fillet_1_piece_27a_section:
        with BuildLine():
            CenterArc((FILLET_1_R * 0.57735026919, -FILLET_1_R), FILLET_1_R, 90, 60)
            Line((-FILLET_1_R * 0.288675134595, -FILLET_1_R * 0.5), (0, 0))
            Line((0, 0), (FILLET_1_R * 0.57735026919, 0))
        make_face()
    fillet_1_piece_27a = extrude(amount=4.618802154, mode=Mode.PRIVATE)
    fillet_1_piece_27a = split(fillet_1_piece_27a, bisect_by=Plane(origin=(22.142395913, 2.347749558, 38.804787139), z_dir=(0, 0, -1)), keep=Keep.TOP, mode=Mode.PRIVATE)
    fillet_1_piece_27a = split(fillet_1_piece_27a, bisect_by=Plane(origin=(22.638351172, 2.347749558, 38.308831879), z_dir=(-1, 0, 0)), keep=Keep.TOP, mode=Mode.PRIVATE)
    with BuildSketch(Plane(origin=(22.638351172, -0.5, 38.804787139), x_dir=(-1, 0, 0), z_dir=(0, 1, 0))) as fillet_1_piece_27b_section:
        with BuildLine():
            CenterArc((FILLET_1_R, -FILLET_1_R), FILLET_1_R, 90, 90)
            Line((0, -FILLET_1_R), (0, 0))
            Line((0, 0), (FILLET_1_R, 0))
        make_face()
    fillet_1_piece_27b = extrude(amount=6, mode=Mode.PRIVATE)
    fillet_1_piece_27b = split(fillet_1_piece_27b, bisect_by=Plane(origin=(22.411781885, 1.507353177, 39.297433962), z_dir=(0, -0.7071067811865476, -0.7071067811865476)), keep=Keep.TOP, mode=Mode.PRIVATE)
    fillet_1_piece_27b = split(fillet_1_piece_27b, bisect_by=Plane(origin=(23.130997996, 1.507353177, 38.578217851), z_dir=(-0.7071067811865476, -0.7071067811865476, 0)), keep=Keep.TOP, mode=Mode.PRIVATE)
    fillet_1_piece_27 = fillet_1_piece_27a & fillet_1_piece_27b
    add(fillet_1_piece_27, mode=Mode.SUBTRACT)
    with BuildSketch(Plane(origin=(24.471684506, 0.166666667, -14.028546194), x_dir=(-0.816496580927726, -0.4082482904638632, -0.40824829046386296), z_dir=(-0.5773502691896258, 0.5773502691896258, 0.5773502691896258))) as fillet_1_piece_28a_section:
        with BuildLine():
            CenterArc((FILLET_1_R * 0.57735026919, FILLET_1_R), FILLET_1_R, 210, 60)
            Line((-FILLET_1_R * 0.288675134595, FILLET_1_R * 0.5), (0, 0))
            Line((0, 0), (FILLET_1_R * 0.57735026919, 0))
        make_face()
    fillet_1_piece_28a = extrude(amount=4.618802154, mode=Mode.PRIVATE)
    fillet_1_piece_28a = split(fillet_1_piece_28a, bisect_by=Plane(origin=(22.142395913, 2.347749558, -12.195212861), z_dir=(0, 0, 1)), keep=Keep.TOP, mode=Mode.PRIVATE)
    fillet_1_piece_28a = split(fillet_1_piece_28a, bisect_by=Plane(origin=(22.638351172, 2.347749558, -11.699257601), z_dir=(-1, 0, 0)), keep=Keep.TOP, mode=Mode.PRIVATE)
    with BuildSketch(Plane(origin=(22.638351172, -0.5, -12.195212861), x_dir=(-1, 0, 0), z_dir=(0, 1, 0))) as fillet_1_piece_28b_section:
        with BuildLine():
            CenterArc((FILLET_1_R, FILLET_1_R), FILLET_1_R, 180, 90)
            Line((0, FILLET_1_R), (0, 0))
            Line((0, 0), (FILLET_1_R, 0))
        make_face()
    fillet_1_piece_28b = extrude(amount=6, mode=Mode.PRIVATE)
    fillet_1_piece_28b = split(fillet_1_piece_28b, bisect_by=Plane(origin=(22.411781885, 1.507353177, -12.687859684), z_dir=(0, -0.7071067811865476, 0.7071067811865476)), keep=Keep.TOP, mode=Mode.PRIVATE)
    fillet_1_piece_28b = split(fillet_1_piece_28b, bisect_by=Plane(origin=(23.130997996, 1.507353177, -11.968643573), z_dir=(-0.7071067811865476, -0.7071067811865476, 0)), keep=Keep.TOP, mode=Mode.PRIVATE)
    fillet_1_piece_28 = fillet_1_piece_28a & fillet_1_piece_28b
    add(fillet_1_piece_28, mode=Mode.SUBTRACT)


solid = part.part
